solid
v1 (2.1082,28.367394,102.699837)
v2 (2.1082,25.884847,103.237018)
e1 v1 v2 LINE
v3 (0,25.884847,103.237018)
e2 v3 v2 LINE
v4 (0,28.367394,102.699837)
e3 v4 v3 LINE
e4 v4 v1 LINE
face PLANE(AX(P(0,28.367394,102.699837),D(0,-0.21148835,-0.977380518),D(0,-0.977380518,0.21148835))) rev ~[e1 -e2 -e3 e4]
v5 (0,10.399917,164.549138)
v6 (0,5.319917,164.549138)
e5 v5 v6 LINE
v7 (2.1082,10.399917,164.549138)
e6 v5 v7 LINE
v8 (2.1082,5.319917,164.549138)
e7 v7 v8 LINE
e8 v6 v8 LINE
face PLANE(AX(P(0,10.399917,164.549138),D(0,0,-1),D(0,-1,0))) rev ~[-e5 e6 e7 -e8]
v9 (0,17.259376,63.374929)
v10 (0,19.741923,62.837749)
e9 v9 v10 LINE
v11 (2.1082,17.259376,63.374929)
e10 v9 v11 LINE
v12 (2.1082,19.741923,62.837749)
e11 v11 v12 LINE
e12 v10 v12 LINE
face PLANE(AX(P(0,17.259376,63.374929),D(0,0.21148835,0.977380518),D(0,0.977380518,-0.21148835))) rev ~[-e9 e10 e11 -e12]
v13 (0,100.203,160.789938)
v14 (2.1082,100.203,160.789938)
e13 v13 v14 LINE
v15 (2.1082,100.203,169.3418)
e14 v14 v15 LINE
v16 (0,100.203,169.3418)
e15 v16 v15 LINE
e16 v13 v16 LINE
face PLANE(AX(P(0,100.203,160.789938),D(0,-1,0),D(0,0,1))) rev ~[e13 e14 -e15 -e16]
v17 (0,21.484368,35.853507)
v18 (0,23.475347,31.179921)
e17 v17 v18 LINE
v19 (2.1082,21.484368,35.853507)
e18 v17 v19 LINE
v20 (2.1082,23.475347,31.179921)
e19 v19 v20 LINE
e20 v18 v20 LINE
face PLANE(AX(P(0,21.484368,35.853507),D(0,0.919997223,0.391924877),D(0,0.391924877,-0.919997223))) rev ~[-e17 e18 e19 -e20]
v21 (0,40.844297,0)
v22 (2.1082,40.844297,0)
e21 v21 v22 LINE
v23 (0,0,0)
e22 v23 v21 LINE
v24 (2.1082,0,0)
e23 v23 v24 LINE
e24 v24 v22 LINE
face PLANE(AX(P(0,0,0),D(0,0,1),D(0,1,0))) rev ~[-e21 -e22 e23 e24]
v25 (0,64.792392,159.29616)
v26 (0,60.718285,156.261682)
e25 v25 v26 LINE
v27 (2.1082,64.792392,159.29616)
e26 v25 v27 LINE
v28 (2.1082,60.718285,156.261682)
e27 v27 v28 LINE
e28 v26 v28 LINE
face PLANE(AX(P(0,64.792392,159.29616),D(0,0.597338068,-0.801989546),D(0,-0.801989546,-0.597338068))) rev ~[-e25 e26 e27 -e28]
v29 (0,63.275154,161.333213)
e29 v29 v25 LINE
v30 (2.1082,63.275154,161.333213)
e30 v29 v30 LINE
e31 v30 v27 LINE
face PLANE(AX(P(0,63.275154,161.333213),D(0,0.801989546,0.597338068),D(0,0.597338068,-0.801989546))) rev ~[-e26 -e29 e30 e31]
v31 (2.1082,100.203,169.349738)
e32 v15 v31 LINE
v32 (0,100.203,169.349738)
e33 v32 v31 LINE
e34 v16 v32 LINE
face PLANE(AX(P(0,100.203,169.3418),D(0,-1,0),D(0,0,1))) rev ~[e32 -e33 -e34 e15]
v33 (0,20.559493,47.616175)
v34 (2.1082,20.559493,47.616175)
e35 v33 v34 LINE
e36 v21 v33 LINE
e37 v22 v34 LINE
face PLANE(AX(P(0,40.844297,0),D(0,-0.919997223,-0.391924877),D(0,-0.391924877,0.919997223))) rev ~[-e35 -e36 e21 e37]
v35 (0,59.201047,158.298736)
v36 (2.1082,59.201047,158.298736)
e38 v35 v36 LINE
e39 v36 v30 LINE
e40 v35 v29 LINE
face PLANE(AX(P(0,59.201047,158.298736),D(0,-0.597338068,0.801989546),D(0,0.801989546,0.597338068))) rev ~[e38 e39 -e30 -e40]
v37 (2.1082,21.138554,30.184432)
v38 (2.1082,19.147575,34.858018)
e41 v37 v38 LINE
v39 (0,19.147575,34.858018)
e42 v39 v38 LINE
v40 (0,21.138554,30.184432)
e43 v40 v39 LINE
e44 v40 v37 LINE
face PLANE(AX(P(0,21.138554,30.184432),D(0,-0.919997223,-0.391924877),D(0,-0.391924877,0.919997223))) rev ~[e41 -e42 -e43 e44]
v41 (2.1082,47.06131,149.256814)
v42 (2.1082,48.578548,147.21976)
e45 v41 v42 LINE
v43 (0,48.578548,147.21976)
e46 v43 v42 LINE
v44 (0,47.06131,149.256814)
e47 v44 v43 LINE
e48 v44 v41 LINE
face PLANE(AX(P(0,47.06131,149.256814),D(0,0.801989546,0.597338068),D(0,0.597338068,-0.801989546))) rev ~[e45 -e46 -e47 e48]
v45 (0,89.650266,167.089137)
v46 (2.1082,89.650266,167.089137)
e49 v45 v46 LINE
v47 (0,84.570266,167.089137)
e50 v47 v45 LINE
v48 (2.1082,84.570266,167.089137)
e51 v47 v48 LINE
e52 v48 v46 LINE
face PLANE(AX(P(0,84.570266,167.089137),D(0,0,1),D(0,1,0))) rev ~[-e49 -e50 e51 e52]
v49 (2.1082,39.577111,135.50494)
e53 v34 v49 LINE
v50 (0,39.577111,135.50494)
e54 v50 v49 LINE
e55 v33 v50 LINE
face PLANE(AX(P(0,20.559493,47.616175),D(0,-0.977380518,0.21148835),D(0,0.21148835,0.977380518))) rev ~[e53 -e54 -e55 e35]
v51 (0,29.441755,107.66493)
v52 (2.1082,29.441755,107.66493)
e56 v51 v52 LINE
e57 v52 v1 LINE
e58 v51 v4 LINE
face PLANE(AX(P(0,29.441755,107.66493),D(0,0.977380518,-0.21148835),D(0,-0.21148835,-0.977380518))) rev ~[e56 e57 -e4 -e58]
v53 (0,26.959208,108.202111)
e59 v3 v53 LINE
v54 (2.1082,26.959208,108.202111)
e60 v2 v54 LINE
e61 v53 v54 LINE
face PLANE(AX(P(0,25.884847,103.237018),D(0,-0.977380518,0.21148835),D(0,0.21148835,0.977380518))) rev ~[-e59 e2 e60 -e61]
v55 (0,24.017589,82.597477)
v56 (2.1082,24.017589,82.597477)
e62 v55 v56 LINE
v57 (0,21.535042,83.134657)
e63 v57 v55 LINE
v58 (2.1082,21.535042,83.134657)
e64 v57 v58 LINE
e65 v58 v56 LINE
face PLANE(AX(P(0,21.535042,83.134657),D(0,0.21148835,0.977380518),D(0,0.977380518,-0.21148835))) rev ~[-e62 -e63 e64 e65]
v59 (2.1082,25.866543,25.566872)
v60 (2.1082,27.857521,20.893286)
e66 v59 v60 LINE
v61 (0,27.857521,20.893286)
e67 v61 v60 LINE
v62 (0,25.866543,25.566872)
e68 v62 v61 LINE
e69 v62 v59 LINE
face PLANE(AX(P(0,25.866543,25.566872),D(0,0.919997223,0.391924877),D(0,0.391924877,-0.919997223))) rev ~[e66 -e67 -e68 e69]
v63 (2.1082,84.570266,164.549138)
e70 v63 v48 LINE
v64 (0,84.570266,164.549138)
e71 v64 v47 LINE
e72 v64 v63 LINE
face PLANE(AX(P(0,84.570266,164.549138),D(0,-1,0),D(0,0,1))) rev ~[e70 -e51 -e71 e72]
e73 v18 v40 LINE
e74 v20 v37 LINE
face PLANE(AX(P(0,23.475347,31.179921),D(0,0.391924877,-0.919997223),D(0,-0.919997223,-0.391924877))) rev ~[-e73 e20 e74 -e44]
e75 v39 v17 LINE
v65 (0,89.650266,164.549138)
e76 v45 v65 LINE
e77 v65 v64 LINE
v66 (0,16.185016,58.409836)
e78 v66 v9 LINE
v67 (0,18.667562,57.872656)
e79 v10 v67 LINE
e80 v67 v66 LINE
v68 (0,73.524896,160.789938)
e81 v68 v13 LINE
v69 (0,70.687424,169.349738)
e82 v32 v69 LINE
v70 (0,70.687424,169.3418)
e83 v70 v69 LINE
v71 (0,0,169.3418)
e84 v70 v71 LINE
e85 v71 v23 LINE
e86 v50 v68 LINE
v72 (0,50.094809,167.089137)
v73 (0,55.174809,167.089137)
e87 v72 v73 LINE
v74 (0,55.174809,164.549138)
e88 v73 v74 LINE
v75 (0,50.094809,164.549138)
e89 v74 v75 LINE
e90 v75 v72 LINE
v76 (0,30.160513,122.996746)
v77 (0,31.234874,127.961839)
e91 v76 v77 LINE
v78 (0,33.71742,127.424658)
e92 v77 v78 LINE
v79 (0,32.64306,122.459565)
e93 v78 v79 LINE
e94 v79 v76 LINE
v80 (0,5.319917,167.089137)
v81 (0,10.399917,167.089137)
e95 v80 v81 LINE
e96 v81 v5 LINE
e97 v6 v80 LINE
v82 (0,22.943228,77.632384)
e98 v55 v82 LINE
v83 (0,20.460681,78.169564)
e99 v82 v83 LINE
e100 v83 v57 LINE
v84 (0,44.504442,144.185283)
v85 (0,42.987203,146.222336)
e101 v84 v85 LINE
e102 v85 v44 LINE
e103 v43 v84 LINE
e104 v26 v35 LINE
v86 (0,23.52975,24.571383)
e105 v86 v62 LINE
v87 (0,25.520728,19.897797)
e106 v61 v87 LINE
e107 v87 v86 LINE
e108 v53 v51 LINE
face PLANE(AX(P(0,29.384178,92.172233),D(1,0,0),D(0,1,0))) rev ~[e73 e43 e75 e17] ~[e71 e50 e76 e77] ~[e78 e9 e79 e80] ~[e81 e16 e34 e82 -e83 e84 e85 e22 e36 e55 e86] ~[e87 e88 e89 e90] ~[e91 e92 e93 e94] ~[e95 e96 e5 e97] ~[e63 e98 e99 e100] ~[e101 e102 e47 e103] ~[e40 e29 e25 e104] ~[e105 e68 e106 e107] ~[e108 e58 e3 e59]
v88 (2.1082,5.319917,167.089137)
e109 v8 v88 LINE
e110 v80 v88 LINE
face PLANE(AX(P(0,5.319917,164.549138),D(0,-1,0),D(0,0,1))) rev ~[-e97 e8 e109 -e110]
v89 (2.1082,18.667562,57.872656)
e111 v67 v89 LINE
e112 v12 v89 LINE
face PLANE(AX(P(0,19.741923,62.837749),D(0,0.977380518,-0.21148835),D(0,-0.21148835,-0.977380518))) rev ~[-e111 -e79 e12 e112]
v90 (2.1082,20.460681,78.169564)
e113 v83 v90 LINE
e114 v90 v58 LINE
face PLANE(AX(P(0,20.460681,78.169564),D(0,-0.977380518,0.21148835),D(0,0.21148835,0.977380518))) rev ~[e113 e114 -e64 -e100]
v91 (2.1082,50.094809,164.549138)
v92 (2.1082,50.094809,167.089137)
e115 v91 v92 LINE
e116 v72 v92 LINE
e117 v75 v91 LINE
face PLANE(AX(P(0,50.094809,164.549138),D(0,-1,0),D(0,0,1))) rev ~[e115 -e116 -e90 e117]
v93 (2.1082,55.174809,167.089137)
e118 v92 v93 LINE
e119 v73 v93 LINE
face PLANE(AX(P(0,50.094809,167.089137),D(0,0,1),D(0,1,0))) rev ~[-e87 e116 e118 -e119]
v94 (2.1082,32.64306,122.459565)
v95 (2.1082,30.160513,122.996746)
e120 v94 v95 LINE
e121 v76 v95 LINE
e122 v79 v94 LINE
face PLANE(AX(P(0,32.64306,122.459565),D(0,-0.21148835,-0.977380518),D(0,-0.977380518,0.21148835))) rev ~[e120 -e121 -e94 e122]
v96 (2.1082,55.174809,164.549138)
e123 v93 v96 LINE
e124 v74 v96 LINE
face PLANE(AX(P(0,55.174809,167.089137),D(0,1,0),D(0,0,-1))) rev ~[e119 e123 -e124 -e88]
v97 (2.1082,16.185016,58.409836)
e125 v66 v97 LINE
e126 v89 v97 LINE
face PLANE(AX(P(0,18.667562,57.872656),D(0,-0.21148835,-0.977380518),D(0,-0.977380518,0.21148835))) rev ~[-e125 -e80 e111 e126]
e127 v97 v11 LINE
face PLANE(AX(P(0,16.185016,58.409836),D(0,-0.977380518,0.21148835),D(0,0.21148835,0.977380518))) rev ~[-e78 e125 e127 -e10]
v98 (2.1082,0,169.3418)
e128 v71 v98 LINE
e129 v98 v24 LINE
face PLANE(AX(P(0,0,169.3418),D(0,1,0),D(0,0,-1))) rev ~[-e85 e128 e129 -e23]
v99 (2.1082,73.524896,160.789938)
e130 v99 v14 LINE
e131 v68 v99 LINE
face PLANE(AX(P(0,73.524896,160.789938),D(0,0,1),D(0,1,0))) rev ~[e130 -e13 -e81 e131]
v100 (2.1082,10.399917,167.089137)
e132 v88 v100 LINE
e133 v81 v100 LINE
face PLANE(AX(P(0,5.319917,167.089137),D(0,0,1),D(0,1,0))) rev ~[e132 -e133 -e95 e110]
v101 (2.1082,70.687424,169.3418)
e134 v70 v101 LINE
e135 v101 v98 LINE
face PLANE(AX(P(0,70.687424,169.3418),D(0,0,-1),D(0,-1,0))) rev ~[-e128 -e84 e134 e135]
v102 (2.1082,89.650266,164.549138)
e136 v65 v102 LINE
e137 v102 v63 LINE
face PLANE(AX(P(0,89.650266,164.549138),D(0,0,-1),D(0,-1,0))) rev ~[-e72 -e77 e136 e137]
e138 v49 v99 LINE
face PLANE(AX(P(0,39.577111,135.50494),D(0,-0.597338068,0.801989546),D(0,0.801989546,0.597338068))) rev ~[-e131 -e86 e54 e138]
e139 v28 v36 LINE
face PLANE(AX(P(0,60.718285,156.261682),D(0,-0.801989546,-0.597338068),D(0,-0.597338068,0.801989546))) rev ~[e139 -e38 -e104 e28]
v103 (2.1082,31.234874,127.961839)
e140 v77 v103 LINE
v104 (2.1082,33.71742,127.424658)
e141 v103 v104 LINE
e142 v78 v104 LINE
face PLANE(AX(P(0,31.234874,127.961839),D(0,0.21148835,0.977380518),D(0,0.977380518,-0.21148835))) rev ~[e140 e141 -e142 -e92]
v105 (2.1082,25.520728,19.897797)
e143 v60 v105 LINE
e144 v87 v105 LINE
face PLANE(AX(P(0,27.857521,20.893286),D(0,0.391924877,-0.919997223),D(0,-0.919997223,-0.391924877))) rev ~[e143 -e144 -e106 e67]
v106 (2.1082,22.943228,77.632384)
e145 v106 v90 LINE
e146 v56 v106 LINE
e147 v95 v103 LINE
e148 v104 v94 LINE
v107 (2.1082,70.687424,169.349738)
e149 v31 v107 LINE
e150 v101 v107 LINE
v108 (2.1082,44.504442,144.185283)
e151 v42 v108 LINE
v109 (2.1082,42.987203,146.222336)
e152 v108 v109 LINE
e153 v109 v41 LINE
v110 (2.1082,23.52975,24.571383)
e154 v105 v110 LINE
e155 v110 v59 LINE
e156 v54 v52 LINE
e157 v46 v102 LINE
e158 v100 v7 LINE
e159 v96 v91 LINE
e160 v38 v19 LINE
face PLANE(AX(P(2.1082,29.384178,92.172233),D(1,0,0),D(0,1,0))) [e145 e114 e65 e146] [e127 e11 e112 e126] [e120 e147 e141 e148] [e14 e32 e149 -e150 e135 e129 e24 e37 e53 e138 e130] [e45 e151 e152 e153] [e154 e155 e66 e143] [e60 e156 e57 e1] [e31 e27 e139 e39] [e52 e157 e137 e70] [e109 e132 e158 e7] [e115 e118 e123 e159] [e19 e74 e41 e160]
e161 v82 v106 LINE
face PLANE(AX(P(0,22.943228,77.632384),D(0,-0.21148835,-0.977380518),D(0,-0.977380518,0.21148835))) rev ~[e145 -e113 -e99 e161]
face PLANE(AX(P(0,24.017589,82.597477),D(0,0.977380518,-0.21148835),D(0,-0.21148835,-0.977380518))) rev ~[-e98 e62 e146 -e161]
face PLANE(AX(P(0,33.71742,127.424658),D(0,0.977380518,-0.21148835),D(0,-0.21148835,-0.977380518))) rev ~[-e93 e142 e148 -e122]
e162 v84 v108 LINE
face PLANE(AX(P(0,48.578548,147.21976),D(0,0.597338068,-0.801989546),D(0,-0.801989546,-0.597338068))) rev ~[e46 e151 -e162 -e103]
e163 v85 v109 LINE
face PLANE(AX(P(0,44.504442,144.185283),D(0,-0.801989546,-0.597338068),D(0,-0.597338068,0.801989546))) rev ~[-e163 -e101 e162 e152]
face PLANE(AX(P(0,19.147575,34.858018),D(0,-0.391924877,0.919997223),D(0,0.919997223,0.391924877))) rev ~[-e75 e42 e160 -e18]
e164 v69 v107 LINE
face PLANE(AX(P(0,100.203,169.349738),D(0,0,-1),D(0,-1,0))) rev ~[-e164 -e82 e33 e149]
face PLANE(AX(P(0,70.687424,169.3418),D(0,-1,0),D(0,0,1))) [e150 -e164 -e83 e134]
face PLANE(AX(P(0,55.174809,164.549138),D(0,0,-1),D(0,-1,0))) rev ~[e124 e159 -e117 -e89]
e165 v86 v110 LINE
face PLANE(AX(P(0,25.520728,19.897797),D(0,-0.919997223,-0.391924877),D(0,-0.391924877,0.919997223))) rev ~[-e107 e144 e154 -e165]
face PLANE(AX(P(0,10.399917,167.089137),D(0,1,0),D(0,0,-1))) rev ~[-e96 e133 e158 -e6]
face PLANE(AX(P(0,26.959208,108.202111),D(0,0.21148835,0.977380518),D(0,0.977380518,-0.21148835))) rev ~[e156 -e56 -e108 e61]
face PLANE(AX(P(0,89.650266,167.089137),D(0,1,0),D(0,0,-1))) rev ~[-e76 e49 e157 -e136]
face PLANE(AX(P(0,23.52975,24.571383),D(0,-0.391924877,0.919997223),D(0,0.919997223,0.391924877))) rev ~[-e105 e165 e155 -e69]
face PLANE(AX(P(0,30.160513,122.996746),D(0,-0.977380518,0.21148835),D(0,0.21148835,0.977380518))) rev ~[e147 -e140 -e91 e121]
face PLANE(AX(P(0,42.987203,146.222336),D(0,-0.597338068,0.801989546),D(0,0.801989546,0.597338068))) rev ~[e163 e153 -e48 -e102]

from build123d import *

# Parameters (mm, degrees)
F0_W     = 8.912432854
F0_H     = 0.0079375
F0_W_2   = 2.54
F0_W_3   = 18.0631426697
F1_DEPTH = 2.1082


with BuildPart() as f1:
    # F0 (on Right) → F1 (new body)
    with BuildSketch(Plane.YZ):
        with BuildLine():
            Line((0, 162.0091375), (0, 0))
            Line((0, 0), (12.335197777, 0))
            Line((12.335197777, 0), (18.8042013144, 29.896105485))
            Line((18.8042013144, 29.896105485), (30.5493542935, 2.3257501254))
            Line((30.5493542935, 2.3257501254), (31.5401391658, 0))
            Line((31.5401391658, 0), (31.5707651968, 0))
            Line((31.5707651968, 0), (40.8442968098, 0))
            Line((40.8442968098, 0), (20.5594925834, 47.616175108))
            Line((20.5594925834, 47.616175108), (39.5771112022, 135.5049402038))
            Line((39.5771112022, 135.5049402038), (73.5248959406, 160.7899383022))
            Line((73.5248959406, 160.7899383022), (100.203, 160.7899383022))
            Line((100.203, 160.7899383022), (100.203, 162.0091375))
            Line((100.203, 162.0091375), (82.1398573303, 162.0091375))
            ThreePointArc((82.1398573303, 162.0091375), (80.3438061061, 162.7530862758), (79.5998573303, 164.5491375))
            Line((79.5998573303, 164.5491375), (79.5998573303, 169.3418))
            Line((79.5998573303, 169.3418), (70.6874244764, 169.3418))
            Line((70.6874244764, 169.3418), (70.6874244764, 165.8480664454))
            Line((70.6874244764, 165.8480664454), (70.6874244764, 164.5491375))
            ThreePointArc((70.6874244764, 164.5491375), (70.0510915867, 162.8675752701), (68.4609272063, 162.0285589874))
            ThreePointArc((68.4609272063, 162.0285589874), (68.3044763435, 162.0139975214), (68.1474244764, 162.0091375))
            Line((68.1474244764, 162.0091375), (0, 162.0091375))
        make_face()
        Polygon((21.4843682503, 35.8535070154), (23.4753466245, 31.1799211209), (21.1385536773, 30.1844319338), (19.147575303, 34.8580178283), align=None, mode=Mode.SUBTRACT)
        Polygon((25.8665425285, 25.5668719827), (27.8575209028, 20.8932860882), (25.5207279555, 19.8977969011), (23.5297495813, 24.5713827956), align=None, mode=Mode.SUBTRACT)
        with BuildLine():
            Line((12.3986134924, 50.3752630702), (11.6175919588, 46.7658196656))
            Line((11.6175919588, 46.7658196656), (10.5918, 46.7658196656))
            Line((10.5918, 46.7658196656), (10.5918, 158.7579375))
            Line((10.5918, 158.7579375), (35.8507619547, 158.7579375))
            Line((35.8507619547, 158.7579375), (31.8897708968, 140.4524587956))
            Line((31.8897708968, 140.4524587956), (31.1087493632, 136.8430153909))
            Line((31.1087493632, 136.8430153909), (35.5475592049, 135.882533211))
            ThreePointArc((35.5475592049, 135.882533211), (37.1456481821, 134.7755682604), (37.4929253116, 132.8628062845))
            Line((37.4929253116, 132.8628062845), (29.5595533377, 96.1992113407))
            ThreePointArc((29.5595533377, 96.1992113407), (28.452588387, 94.6011223635), (26.5398264112, 94.2538452339))
            Line((26.5398264112, 94.2538452339), (22.1010165695, 95.2143274138))
            Line((22.1010165695, 95.2143274138), (21.7536814278, 93.6091392306))
            Line((21.7536814278, 93.6091392306), (21.4063462861, 92.0039510473))
            Line((21.4063462861, 92.0039510473), (25.8451561277, 91.0434688674))
            ThreePointArc((25.8451561277, 91.0434688674), (27.4432451049, 89.9365039168), (27.7905222345, 88.0237419409))
            Line((27.7905222345, 88.0237419409), (19.8571502605, 51.3601469971))
            ThreePointArc((19.8571502605, 51.3601469971), (18.7501853099, 49.7620580199), (16.837423334, 49.4147808903))
            Line((16.837423334, 49.4147808903), (12.3986134924, 50.3752630702))
        make_face(mode=Mode.SUBTRACT)
        Polygon((47.0613097153, 149.2568137468), (48.5785484084, 147.2197602993), (44.5044415132, 144.1852829132), (42.9872028202, 146.2223363607), align=None, mode=Mode.SUBTRACT)
        Polygon((44.8088104432, 150.074821282), (46.6876875952, 158.7579375), (56.4668125154, 158.7579375), align=None, mode=Mode.SUBTRACT)
        Polygon((63.2751536106, 161.3332132886), (64.7923923036, 159.296159841), (60.7182854085, 156.2616824549), (59.2010467154, 158.2987359025), align=None, mode=Mode.SUBTRACT)
        with BuildLine():
            Line((0, 164.5491375), (0, 162.0091375))
            Line((0, 162.0091375), (68.1474244764, 162.0091375))
            ThreePointArc((68.1474244764, 162.0091375), (68.3044763435, 162.0139975214), (68.4609272063, 162.0285589874))
            Line((68.4609272063, 162.0285589874), (69.6856973646, 162.9407926238))
            Line((69.6856973646, 162.9407926238), (68.1474244764, 165.0060867035))
            Line((68.1474244764, 165.0060867035), (68.1474244764, 164.5491375))
            Line((68.1474244764, 164.5491375), (55.1748093832, 164.5491375))
            Line((55.1748093832, 164.5491375), (50.0948093832, 164.5491375))
            Line((50.0948093832, 164.5491375), (10.3999171089, 164.5491375))
            Line((10.3999171089, 164.5491375), (5.3199171089, 164.5491375))
            Line((5.3199171089, 164.5491375), (0, 164.5491375))
        make_face()
        Polygon((18.8042013144, 29.896105485), (12.335197777, 0), (13.2072197655, 0), (31.5401391658, 0), (30.5493542935, 2.3257501254), align=None)
        Polygon((0, 169.3418), (0, 164.5491375), (5.3199171089, 164.5491375), (5.3199171089, 167.0891375), (10.3999171089, 167.0891375), (10.3999171089, 164.5491375), (50.0948093832, 164.5491375), (50.0948093832, 167.0891375), (55.1748093832, 167.0891375), (55.1748093832, 164.5491375), (68.1474244764, 164.5491375), (68.1474244764, 165.0060867035), (68.1474244764, 169.3418), align=None)
        with BuildLine():
            Line((69.6856973646, 162.9407926238), (68.4609272063, 162.0285589874))
            ThreePointArc((68.4609272063, 162.0285589874), (70.0510915867, 162.8675752701), (70.6874244764, 164.5491375))
            Line((70.6874244764, 164.5491375), (70.6874244764, 165.8480664454))
            Line((70.6874244764, 165.8480664454), (70.6874244764, 169.3418))
            Line((70.6874244764, 169.3418), (68.1474244764, 169.3418))
            Line((68.1474244764, 169.3418), (68.1474244764, 165.0060867035))
            Line((68.1474244764, 165.0060867035), (69.6856973646, 162.9407926238))
        make_face()
        with Locations((75.1436409033, 169.34576875)):
            Rectangle(F0_W, F0_H)
        with Locations((80.8698573303, 169.34576875)):
            Rectangle(F0_W_2, F0_H)
        with BuildLine():
            Line((82.1398573303, 169.3418), (79.5998573303, 169.3418))
            Line((79.5998573303, 169.3418), (79.5998573303, 164.5491375))
            ThreePointArc((79.5998573303, 164.5491375), (80.3438061061, 162.7530862758), (82.1398573303, 162.0091375))
            Line((82.1398573303, 162.0091375), (100.203, 162.0091375))
            Line((100.203, 162.0091375), (100.203, 164.5491375))
            Line((100.203, 164.5491375), (89.6502663064, 164.5491375))
            Line((89.6502663064, 164.5491375), (84.5702663064, 164.5491375))
            Line((84.5702663064, 164.5491375), (82.1398573303, 164.5491375))
            Line((82.1398573303, 164.5491375), (82.1398573303, 169.3418))
        make_face()
        with Locations((91.1714286652, 169.34576875)):
            Rectangle(F0_W_3, F0_H)
        Polygon((100.203, 169.3418), (82.1398573303, 169.3418), (82.1398573303, 164.5491375), (84.5702663064, 164.5491375), (84.5702663064, 167.0891375), (89.6502663064, 167.0891375), (89.6502663064, 164.5491375), (100.203, 164.5491375), align=None)
        Polygon((10.5918, 46.7658196656), (11.6175919588, 46.7658196656), (12.3986134924, 50.3752630702), (12.9357939022, 52.8578095868), (20.8691658762, 89.5214045307), (21.4063462861, 92.0039510473), (21.7536814278, 93.6091392306), (22.1010165695, 95.2143274138), (22.6381969794, 97.6968739305), (30.5715689534, 134.3604688743), (31.1087493632, 136.8430153909), (31.8897708968, 140.4524587956), (35.8507619547, 158.7579375), (10.5918, 158.7579375), align=None)
        with BuildLine():
            Line((12.9357939022, 52.8578095868), (12.3986134924, 50.3752630702))
            Line((12.3986134924, 50.3752630702), (16.837423334, 49.4147808903))
            ThreePointArc((16.837423334, 49.4147808903), (18.7501853099, 49.7620580199), (19.8571502605, 51.3601469971))
            Line((19.8571502605, 51.3601469971), (27.7905222345, 88.0237419409))
            ThreePointArc((27.7905222345, 88.0237419409), (27.4432451049, 89.9365039168), (25.8451561277, 91.0434688674))
            Line((25.8451561277, 91.0434688674), (21.4063462861, 92.0039510473))
            Line((21.4063462861, 92.0039510473), (20.8691658762, 89.5214045307))
            Line((20.8691658762, 89.5214045307), (25.3079757178, 88.5609223508))
            Line((25.3079757178, 88.5609223508), (24.0175885553, 82.5974767434))
            Line((24.0175885553, 82.5974767434), (22.9432277355, 77.6323837102))
            Line((22.9432277355, 77.6323837102), (19.7419229759, 62.8377489213))
            Line((19.7419229759, 62.8377489213), (18.6675621562, 57.872655888))
            Line((18.6675621562, 57.872655888), (17.3746037439, 51.8973274069))
            Line((17.3746037439, 51.8973274069), (12.9357939022, 52.8578095868))
        make_face()
        Polygon((20.8691658762, 89.5214045307), (12.9357939022, 52.8578095868), (17.3746037439, 51.8973274069), (18.6675621562, 57.872655888), (16.1850156395, 58.4098362979), (17.2593764593, 63.3749293312), (19.7419229759, 62.8377489213), (22.9432277355, 77.6323837102), (20.4606812189, 78.16956412), (21.5350420386, 83.1346571533), (24.0175885553, 82.5974767434), (25.3079757178, 88.5609223508), align=None)
        with BuildLine():
            Line((35.5475592049, 135.882533211), (31.1087493632, 136.8430153909))
            Line((31.1087493632, 136.8430153909), (30.5715689534, 134.3604688743))
            Line((30.5715689534, 134.3604688743), (35.010378795, 133.3999866944))
            Line((35.010378795, 133.3999866944), (33.7174203827, 127.4246582133))
            Line((33.7174203827, 127.4246582133), (32.643059563, 122.45956518))
            Line((32.643059563, 122.45956518), (29.4417548033, 107.6649303911))
            Line((29.4417548033, 107.6649303911), (28.3673939836, 102.6998373579))
            Line((28.3673939836, 102.6998373579), (27.077006821, 96.7363917505))
            Line((27.077006821, 96.7363917505), (22.6381969794, 97.6968739305))
            Line((22.6381969794, 97.6968739305), (22.1010165695, 95.2143274138))
            Line((22.1010165695, 95.2143274138), (26.5398264112, 94.2538452339))
            ThreePointArc((26.5398264112, 94.2538452339), (28.452588387, 94.6011223635), (29.5595533377, 96.1992113407))
            Line((29.5595533377, 96.1992113407), (37.4929253116, 132.8628062845))
            ThreePointArc((37.4929253116, 132.8628062845), (37.1456481821, 134.7755682604), (35.5475592049, 135.882533211))
        make_face()
        Polygon((35.010378795, 133.3999866944), (30.5715689534, 134.3604688743), (22.6381969794, 97.6968739305), (27.077006821, 96.7363917505), (28.3673939836, 102.6998373579), (25.884847467, 103.2370177677), (26.9592082867, 108.202110801), (29.4417548033, 107.6649303911), (32.643059563, 122.45956518), (30.1605130463, 122.9967455899), (31.2348738661, 127.9618386231), (33.7174203827, 127.4246582133), align=None)
        Polygon((56.4668125154, 158.7579375), (46.6876875952, 158.7579375), (44.8088104432, 150.074821282), align=None)
    extrude(amount=F1_DEPTH)


solid = f1.part
